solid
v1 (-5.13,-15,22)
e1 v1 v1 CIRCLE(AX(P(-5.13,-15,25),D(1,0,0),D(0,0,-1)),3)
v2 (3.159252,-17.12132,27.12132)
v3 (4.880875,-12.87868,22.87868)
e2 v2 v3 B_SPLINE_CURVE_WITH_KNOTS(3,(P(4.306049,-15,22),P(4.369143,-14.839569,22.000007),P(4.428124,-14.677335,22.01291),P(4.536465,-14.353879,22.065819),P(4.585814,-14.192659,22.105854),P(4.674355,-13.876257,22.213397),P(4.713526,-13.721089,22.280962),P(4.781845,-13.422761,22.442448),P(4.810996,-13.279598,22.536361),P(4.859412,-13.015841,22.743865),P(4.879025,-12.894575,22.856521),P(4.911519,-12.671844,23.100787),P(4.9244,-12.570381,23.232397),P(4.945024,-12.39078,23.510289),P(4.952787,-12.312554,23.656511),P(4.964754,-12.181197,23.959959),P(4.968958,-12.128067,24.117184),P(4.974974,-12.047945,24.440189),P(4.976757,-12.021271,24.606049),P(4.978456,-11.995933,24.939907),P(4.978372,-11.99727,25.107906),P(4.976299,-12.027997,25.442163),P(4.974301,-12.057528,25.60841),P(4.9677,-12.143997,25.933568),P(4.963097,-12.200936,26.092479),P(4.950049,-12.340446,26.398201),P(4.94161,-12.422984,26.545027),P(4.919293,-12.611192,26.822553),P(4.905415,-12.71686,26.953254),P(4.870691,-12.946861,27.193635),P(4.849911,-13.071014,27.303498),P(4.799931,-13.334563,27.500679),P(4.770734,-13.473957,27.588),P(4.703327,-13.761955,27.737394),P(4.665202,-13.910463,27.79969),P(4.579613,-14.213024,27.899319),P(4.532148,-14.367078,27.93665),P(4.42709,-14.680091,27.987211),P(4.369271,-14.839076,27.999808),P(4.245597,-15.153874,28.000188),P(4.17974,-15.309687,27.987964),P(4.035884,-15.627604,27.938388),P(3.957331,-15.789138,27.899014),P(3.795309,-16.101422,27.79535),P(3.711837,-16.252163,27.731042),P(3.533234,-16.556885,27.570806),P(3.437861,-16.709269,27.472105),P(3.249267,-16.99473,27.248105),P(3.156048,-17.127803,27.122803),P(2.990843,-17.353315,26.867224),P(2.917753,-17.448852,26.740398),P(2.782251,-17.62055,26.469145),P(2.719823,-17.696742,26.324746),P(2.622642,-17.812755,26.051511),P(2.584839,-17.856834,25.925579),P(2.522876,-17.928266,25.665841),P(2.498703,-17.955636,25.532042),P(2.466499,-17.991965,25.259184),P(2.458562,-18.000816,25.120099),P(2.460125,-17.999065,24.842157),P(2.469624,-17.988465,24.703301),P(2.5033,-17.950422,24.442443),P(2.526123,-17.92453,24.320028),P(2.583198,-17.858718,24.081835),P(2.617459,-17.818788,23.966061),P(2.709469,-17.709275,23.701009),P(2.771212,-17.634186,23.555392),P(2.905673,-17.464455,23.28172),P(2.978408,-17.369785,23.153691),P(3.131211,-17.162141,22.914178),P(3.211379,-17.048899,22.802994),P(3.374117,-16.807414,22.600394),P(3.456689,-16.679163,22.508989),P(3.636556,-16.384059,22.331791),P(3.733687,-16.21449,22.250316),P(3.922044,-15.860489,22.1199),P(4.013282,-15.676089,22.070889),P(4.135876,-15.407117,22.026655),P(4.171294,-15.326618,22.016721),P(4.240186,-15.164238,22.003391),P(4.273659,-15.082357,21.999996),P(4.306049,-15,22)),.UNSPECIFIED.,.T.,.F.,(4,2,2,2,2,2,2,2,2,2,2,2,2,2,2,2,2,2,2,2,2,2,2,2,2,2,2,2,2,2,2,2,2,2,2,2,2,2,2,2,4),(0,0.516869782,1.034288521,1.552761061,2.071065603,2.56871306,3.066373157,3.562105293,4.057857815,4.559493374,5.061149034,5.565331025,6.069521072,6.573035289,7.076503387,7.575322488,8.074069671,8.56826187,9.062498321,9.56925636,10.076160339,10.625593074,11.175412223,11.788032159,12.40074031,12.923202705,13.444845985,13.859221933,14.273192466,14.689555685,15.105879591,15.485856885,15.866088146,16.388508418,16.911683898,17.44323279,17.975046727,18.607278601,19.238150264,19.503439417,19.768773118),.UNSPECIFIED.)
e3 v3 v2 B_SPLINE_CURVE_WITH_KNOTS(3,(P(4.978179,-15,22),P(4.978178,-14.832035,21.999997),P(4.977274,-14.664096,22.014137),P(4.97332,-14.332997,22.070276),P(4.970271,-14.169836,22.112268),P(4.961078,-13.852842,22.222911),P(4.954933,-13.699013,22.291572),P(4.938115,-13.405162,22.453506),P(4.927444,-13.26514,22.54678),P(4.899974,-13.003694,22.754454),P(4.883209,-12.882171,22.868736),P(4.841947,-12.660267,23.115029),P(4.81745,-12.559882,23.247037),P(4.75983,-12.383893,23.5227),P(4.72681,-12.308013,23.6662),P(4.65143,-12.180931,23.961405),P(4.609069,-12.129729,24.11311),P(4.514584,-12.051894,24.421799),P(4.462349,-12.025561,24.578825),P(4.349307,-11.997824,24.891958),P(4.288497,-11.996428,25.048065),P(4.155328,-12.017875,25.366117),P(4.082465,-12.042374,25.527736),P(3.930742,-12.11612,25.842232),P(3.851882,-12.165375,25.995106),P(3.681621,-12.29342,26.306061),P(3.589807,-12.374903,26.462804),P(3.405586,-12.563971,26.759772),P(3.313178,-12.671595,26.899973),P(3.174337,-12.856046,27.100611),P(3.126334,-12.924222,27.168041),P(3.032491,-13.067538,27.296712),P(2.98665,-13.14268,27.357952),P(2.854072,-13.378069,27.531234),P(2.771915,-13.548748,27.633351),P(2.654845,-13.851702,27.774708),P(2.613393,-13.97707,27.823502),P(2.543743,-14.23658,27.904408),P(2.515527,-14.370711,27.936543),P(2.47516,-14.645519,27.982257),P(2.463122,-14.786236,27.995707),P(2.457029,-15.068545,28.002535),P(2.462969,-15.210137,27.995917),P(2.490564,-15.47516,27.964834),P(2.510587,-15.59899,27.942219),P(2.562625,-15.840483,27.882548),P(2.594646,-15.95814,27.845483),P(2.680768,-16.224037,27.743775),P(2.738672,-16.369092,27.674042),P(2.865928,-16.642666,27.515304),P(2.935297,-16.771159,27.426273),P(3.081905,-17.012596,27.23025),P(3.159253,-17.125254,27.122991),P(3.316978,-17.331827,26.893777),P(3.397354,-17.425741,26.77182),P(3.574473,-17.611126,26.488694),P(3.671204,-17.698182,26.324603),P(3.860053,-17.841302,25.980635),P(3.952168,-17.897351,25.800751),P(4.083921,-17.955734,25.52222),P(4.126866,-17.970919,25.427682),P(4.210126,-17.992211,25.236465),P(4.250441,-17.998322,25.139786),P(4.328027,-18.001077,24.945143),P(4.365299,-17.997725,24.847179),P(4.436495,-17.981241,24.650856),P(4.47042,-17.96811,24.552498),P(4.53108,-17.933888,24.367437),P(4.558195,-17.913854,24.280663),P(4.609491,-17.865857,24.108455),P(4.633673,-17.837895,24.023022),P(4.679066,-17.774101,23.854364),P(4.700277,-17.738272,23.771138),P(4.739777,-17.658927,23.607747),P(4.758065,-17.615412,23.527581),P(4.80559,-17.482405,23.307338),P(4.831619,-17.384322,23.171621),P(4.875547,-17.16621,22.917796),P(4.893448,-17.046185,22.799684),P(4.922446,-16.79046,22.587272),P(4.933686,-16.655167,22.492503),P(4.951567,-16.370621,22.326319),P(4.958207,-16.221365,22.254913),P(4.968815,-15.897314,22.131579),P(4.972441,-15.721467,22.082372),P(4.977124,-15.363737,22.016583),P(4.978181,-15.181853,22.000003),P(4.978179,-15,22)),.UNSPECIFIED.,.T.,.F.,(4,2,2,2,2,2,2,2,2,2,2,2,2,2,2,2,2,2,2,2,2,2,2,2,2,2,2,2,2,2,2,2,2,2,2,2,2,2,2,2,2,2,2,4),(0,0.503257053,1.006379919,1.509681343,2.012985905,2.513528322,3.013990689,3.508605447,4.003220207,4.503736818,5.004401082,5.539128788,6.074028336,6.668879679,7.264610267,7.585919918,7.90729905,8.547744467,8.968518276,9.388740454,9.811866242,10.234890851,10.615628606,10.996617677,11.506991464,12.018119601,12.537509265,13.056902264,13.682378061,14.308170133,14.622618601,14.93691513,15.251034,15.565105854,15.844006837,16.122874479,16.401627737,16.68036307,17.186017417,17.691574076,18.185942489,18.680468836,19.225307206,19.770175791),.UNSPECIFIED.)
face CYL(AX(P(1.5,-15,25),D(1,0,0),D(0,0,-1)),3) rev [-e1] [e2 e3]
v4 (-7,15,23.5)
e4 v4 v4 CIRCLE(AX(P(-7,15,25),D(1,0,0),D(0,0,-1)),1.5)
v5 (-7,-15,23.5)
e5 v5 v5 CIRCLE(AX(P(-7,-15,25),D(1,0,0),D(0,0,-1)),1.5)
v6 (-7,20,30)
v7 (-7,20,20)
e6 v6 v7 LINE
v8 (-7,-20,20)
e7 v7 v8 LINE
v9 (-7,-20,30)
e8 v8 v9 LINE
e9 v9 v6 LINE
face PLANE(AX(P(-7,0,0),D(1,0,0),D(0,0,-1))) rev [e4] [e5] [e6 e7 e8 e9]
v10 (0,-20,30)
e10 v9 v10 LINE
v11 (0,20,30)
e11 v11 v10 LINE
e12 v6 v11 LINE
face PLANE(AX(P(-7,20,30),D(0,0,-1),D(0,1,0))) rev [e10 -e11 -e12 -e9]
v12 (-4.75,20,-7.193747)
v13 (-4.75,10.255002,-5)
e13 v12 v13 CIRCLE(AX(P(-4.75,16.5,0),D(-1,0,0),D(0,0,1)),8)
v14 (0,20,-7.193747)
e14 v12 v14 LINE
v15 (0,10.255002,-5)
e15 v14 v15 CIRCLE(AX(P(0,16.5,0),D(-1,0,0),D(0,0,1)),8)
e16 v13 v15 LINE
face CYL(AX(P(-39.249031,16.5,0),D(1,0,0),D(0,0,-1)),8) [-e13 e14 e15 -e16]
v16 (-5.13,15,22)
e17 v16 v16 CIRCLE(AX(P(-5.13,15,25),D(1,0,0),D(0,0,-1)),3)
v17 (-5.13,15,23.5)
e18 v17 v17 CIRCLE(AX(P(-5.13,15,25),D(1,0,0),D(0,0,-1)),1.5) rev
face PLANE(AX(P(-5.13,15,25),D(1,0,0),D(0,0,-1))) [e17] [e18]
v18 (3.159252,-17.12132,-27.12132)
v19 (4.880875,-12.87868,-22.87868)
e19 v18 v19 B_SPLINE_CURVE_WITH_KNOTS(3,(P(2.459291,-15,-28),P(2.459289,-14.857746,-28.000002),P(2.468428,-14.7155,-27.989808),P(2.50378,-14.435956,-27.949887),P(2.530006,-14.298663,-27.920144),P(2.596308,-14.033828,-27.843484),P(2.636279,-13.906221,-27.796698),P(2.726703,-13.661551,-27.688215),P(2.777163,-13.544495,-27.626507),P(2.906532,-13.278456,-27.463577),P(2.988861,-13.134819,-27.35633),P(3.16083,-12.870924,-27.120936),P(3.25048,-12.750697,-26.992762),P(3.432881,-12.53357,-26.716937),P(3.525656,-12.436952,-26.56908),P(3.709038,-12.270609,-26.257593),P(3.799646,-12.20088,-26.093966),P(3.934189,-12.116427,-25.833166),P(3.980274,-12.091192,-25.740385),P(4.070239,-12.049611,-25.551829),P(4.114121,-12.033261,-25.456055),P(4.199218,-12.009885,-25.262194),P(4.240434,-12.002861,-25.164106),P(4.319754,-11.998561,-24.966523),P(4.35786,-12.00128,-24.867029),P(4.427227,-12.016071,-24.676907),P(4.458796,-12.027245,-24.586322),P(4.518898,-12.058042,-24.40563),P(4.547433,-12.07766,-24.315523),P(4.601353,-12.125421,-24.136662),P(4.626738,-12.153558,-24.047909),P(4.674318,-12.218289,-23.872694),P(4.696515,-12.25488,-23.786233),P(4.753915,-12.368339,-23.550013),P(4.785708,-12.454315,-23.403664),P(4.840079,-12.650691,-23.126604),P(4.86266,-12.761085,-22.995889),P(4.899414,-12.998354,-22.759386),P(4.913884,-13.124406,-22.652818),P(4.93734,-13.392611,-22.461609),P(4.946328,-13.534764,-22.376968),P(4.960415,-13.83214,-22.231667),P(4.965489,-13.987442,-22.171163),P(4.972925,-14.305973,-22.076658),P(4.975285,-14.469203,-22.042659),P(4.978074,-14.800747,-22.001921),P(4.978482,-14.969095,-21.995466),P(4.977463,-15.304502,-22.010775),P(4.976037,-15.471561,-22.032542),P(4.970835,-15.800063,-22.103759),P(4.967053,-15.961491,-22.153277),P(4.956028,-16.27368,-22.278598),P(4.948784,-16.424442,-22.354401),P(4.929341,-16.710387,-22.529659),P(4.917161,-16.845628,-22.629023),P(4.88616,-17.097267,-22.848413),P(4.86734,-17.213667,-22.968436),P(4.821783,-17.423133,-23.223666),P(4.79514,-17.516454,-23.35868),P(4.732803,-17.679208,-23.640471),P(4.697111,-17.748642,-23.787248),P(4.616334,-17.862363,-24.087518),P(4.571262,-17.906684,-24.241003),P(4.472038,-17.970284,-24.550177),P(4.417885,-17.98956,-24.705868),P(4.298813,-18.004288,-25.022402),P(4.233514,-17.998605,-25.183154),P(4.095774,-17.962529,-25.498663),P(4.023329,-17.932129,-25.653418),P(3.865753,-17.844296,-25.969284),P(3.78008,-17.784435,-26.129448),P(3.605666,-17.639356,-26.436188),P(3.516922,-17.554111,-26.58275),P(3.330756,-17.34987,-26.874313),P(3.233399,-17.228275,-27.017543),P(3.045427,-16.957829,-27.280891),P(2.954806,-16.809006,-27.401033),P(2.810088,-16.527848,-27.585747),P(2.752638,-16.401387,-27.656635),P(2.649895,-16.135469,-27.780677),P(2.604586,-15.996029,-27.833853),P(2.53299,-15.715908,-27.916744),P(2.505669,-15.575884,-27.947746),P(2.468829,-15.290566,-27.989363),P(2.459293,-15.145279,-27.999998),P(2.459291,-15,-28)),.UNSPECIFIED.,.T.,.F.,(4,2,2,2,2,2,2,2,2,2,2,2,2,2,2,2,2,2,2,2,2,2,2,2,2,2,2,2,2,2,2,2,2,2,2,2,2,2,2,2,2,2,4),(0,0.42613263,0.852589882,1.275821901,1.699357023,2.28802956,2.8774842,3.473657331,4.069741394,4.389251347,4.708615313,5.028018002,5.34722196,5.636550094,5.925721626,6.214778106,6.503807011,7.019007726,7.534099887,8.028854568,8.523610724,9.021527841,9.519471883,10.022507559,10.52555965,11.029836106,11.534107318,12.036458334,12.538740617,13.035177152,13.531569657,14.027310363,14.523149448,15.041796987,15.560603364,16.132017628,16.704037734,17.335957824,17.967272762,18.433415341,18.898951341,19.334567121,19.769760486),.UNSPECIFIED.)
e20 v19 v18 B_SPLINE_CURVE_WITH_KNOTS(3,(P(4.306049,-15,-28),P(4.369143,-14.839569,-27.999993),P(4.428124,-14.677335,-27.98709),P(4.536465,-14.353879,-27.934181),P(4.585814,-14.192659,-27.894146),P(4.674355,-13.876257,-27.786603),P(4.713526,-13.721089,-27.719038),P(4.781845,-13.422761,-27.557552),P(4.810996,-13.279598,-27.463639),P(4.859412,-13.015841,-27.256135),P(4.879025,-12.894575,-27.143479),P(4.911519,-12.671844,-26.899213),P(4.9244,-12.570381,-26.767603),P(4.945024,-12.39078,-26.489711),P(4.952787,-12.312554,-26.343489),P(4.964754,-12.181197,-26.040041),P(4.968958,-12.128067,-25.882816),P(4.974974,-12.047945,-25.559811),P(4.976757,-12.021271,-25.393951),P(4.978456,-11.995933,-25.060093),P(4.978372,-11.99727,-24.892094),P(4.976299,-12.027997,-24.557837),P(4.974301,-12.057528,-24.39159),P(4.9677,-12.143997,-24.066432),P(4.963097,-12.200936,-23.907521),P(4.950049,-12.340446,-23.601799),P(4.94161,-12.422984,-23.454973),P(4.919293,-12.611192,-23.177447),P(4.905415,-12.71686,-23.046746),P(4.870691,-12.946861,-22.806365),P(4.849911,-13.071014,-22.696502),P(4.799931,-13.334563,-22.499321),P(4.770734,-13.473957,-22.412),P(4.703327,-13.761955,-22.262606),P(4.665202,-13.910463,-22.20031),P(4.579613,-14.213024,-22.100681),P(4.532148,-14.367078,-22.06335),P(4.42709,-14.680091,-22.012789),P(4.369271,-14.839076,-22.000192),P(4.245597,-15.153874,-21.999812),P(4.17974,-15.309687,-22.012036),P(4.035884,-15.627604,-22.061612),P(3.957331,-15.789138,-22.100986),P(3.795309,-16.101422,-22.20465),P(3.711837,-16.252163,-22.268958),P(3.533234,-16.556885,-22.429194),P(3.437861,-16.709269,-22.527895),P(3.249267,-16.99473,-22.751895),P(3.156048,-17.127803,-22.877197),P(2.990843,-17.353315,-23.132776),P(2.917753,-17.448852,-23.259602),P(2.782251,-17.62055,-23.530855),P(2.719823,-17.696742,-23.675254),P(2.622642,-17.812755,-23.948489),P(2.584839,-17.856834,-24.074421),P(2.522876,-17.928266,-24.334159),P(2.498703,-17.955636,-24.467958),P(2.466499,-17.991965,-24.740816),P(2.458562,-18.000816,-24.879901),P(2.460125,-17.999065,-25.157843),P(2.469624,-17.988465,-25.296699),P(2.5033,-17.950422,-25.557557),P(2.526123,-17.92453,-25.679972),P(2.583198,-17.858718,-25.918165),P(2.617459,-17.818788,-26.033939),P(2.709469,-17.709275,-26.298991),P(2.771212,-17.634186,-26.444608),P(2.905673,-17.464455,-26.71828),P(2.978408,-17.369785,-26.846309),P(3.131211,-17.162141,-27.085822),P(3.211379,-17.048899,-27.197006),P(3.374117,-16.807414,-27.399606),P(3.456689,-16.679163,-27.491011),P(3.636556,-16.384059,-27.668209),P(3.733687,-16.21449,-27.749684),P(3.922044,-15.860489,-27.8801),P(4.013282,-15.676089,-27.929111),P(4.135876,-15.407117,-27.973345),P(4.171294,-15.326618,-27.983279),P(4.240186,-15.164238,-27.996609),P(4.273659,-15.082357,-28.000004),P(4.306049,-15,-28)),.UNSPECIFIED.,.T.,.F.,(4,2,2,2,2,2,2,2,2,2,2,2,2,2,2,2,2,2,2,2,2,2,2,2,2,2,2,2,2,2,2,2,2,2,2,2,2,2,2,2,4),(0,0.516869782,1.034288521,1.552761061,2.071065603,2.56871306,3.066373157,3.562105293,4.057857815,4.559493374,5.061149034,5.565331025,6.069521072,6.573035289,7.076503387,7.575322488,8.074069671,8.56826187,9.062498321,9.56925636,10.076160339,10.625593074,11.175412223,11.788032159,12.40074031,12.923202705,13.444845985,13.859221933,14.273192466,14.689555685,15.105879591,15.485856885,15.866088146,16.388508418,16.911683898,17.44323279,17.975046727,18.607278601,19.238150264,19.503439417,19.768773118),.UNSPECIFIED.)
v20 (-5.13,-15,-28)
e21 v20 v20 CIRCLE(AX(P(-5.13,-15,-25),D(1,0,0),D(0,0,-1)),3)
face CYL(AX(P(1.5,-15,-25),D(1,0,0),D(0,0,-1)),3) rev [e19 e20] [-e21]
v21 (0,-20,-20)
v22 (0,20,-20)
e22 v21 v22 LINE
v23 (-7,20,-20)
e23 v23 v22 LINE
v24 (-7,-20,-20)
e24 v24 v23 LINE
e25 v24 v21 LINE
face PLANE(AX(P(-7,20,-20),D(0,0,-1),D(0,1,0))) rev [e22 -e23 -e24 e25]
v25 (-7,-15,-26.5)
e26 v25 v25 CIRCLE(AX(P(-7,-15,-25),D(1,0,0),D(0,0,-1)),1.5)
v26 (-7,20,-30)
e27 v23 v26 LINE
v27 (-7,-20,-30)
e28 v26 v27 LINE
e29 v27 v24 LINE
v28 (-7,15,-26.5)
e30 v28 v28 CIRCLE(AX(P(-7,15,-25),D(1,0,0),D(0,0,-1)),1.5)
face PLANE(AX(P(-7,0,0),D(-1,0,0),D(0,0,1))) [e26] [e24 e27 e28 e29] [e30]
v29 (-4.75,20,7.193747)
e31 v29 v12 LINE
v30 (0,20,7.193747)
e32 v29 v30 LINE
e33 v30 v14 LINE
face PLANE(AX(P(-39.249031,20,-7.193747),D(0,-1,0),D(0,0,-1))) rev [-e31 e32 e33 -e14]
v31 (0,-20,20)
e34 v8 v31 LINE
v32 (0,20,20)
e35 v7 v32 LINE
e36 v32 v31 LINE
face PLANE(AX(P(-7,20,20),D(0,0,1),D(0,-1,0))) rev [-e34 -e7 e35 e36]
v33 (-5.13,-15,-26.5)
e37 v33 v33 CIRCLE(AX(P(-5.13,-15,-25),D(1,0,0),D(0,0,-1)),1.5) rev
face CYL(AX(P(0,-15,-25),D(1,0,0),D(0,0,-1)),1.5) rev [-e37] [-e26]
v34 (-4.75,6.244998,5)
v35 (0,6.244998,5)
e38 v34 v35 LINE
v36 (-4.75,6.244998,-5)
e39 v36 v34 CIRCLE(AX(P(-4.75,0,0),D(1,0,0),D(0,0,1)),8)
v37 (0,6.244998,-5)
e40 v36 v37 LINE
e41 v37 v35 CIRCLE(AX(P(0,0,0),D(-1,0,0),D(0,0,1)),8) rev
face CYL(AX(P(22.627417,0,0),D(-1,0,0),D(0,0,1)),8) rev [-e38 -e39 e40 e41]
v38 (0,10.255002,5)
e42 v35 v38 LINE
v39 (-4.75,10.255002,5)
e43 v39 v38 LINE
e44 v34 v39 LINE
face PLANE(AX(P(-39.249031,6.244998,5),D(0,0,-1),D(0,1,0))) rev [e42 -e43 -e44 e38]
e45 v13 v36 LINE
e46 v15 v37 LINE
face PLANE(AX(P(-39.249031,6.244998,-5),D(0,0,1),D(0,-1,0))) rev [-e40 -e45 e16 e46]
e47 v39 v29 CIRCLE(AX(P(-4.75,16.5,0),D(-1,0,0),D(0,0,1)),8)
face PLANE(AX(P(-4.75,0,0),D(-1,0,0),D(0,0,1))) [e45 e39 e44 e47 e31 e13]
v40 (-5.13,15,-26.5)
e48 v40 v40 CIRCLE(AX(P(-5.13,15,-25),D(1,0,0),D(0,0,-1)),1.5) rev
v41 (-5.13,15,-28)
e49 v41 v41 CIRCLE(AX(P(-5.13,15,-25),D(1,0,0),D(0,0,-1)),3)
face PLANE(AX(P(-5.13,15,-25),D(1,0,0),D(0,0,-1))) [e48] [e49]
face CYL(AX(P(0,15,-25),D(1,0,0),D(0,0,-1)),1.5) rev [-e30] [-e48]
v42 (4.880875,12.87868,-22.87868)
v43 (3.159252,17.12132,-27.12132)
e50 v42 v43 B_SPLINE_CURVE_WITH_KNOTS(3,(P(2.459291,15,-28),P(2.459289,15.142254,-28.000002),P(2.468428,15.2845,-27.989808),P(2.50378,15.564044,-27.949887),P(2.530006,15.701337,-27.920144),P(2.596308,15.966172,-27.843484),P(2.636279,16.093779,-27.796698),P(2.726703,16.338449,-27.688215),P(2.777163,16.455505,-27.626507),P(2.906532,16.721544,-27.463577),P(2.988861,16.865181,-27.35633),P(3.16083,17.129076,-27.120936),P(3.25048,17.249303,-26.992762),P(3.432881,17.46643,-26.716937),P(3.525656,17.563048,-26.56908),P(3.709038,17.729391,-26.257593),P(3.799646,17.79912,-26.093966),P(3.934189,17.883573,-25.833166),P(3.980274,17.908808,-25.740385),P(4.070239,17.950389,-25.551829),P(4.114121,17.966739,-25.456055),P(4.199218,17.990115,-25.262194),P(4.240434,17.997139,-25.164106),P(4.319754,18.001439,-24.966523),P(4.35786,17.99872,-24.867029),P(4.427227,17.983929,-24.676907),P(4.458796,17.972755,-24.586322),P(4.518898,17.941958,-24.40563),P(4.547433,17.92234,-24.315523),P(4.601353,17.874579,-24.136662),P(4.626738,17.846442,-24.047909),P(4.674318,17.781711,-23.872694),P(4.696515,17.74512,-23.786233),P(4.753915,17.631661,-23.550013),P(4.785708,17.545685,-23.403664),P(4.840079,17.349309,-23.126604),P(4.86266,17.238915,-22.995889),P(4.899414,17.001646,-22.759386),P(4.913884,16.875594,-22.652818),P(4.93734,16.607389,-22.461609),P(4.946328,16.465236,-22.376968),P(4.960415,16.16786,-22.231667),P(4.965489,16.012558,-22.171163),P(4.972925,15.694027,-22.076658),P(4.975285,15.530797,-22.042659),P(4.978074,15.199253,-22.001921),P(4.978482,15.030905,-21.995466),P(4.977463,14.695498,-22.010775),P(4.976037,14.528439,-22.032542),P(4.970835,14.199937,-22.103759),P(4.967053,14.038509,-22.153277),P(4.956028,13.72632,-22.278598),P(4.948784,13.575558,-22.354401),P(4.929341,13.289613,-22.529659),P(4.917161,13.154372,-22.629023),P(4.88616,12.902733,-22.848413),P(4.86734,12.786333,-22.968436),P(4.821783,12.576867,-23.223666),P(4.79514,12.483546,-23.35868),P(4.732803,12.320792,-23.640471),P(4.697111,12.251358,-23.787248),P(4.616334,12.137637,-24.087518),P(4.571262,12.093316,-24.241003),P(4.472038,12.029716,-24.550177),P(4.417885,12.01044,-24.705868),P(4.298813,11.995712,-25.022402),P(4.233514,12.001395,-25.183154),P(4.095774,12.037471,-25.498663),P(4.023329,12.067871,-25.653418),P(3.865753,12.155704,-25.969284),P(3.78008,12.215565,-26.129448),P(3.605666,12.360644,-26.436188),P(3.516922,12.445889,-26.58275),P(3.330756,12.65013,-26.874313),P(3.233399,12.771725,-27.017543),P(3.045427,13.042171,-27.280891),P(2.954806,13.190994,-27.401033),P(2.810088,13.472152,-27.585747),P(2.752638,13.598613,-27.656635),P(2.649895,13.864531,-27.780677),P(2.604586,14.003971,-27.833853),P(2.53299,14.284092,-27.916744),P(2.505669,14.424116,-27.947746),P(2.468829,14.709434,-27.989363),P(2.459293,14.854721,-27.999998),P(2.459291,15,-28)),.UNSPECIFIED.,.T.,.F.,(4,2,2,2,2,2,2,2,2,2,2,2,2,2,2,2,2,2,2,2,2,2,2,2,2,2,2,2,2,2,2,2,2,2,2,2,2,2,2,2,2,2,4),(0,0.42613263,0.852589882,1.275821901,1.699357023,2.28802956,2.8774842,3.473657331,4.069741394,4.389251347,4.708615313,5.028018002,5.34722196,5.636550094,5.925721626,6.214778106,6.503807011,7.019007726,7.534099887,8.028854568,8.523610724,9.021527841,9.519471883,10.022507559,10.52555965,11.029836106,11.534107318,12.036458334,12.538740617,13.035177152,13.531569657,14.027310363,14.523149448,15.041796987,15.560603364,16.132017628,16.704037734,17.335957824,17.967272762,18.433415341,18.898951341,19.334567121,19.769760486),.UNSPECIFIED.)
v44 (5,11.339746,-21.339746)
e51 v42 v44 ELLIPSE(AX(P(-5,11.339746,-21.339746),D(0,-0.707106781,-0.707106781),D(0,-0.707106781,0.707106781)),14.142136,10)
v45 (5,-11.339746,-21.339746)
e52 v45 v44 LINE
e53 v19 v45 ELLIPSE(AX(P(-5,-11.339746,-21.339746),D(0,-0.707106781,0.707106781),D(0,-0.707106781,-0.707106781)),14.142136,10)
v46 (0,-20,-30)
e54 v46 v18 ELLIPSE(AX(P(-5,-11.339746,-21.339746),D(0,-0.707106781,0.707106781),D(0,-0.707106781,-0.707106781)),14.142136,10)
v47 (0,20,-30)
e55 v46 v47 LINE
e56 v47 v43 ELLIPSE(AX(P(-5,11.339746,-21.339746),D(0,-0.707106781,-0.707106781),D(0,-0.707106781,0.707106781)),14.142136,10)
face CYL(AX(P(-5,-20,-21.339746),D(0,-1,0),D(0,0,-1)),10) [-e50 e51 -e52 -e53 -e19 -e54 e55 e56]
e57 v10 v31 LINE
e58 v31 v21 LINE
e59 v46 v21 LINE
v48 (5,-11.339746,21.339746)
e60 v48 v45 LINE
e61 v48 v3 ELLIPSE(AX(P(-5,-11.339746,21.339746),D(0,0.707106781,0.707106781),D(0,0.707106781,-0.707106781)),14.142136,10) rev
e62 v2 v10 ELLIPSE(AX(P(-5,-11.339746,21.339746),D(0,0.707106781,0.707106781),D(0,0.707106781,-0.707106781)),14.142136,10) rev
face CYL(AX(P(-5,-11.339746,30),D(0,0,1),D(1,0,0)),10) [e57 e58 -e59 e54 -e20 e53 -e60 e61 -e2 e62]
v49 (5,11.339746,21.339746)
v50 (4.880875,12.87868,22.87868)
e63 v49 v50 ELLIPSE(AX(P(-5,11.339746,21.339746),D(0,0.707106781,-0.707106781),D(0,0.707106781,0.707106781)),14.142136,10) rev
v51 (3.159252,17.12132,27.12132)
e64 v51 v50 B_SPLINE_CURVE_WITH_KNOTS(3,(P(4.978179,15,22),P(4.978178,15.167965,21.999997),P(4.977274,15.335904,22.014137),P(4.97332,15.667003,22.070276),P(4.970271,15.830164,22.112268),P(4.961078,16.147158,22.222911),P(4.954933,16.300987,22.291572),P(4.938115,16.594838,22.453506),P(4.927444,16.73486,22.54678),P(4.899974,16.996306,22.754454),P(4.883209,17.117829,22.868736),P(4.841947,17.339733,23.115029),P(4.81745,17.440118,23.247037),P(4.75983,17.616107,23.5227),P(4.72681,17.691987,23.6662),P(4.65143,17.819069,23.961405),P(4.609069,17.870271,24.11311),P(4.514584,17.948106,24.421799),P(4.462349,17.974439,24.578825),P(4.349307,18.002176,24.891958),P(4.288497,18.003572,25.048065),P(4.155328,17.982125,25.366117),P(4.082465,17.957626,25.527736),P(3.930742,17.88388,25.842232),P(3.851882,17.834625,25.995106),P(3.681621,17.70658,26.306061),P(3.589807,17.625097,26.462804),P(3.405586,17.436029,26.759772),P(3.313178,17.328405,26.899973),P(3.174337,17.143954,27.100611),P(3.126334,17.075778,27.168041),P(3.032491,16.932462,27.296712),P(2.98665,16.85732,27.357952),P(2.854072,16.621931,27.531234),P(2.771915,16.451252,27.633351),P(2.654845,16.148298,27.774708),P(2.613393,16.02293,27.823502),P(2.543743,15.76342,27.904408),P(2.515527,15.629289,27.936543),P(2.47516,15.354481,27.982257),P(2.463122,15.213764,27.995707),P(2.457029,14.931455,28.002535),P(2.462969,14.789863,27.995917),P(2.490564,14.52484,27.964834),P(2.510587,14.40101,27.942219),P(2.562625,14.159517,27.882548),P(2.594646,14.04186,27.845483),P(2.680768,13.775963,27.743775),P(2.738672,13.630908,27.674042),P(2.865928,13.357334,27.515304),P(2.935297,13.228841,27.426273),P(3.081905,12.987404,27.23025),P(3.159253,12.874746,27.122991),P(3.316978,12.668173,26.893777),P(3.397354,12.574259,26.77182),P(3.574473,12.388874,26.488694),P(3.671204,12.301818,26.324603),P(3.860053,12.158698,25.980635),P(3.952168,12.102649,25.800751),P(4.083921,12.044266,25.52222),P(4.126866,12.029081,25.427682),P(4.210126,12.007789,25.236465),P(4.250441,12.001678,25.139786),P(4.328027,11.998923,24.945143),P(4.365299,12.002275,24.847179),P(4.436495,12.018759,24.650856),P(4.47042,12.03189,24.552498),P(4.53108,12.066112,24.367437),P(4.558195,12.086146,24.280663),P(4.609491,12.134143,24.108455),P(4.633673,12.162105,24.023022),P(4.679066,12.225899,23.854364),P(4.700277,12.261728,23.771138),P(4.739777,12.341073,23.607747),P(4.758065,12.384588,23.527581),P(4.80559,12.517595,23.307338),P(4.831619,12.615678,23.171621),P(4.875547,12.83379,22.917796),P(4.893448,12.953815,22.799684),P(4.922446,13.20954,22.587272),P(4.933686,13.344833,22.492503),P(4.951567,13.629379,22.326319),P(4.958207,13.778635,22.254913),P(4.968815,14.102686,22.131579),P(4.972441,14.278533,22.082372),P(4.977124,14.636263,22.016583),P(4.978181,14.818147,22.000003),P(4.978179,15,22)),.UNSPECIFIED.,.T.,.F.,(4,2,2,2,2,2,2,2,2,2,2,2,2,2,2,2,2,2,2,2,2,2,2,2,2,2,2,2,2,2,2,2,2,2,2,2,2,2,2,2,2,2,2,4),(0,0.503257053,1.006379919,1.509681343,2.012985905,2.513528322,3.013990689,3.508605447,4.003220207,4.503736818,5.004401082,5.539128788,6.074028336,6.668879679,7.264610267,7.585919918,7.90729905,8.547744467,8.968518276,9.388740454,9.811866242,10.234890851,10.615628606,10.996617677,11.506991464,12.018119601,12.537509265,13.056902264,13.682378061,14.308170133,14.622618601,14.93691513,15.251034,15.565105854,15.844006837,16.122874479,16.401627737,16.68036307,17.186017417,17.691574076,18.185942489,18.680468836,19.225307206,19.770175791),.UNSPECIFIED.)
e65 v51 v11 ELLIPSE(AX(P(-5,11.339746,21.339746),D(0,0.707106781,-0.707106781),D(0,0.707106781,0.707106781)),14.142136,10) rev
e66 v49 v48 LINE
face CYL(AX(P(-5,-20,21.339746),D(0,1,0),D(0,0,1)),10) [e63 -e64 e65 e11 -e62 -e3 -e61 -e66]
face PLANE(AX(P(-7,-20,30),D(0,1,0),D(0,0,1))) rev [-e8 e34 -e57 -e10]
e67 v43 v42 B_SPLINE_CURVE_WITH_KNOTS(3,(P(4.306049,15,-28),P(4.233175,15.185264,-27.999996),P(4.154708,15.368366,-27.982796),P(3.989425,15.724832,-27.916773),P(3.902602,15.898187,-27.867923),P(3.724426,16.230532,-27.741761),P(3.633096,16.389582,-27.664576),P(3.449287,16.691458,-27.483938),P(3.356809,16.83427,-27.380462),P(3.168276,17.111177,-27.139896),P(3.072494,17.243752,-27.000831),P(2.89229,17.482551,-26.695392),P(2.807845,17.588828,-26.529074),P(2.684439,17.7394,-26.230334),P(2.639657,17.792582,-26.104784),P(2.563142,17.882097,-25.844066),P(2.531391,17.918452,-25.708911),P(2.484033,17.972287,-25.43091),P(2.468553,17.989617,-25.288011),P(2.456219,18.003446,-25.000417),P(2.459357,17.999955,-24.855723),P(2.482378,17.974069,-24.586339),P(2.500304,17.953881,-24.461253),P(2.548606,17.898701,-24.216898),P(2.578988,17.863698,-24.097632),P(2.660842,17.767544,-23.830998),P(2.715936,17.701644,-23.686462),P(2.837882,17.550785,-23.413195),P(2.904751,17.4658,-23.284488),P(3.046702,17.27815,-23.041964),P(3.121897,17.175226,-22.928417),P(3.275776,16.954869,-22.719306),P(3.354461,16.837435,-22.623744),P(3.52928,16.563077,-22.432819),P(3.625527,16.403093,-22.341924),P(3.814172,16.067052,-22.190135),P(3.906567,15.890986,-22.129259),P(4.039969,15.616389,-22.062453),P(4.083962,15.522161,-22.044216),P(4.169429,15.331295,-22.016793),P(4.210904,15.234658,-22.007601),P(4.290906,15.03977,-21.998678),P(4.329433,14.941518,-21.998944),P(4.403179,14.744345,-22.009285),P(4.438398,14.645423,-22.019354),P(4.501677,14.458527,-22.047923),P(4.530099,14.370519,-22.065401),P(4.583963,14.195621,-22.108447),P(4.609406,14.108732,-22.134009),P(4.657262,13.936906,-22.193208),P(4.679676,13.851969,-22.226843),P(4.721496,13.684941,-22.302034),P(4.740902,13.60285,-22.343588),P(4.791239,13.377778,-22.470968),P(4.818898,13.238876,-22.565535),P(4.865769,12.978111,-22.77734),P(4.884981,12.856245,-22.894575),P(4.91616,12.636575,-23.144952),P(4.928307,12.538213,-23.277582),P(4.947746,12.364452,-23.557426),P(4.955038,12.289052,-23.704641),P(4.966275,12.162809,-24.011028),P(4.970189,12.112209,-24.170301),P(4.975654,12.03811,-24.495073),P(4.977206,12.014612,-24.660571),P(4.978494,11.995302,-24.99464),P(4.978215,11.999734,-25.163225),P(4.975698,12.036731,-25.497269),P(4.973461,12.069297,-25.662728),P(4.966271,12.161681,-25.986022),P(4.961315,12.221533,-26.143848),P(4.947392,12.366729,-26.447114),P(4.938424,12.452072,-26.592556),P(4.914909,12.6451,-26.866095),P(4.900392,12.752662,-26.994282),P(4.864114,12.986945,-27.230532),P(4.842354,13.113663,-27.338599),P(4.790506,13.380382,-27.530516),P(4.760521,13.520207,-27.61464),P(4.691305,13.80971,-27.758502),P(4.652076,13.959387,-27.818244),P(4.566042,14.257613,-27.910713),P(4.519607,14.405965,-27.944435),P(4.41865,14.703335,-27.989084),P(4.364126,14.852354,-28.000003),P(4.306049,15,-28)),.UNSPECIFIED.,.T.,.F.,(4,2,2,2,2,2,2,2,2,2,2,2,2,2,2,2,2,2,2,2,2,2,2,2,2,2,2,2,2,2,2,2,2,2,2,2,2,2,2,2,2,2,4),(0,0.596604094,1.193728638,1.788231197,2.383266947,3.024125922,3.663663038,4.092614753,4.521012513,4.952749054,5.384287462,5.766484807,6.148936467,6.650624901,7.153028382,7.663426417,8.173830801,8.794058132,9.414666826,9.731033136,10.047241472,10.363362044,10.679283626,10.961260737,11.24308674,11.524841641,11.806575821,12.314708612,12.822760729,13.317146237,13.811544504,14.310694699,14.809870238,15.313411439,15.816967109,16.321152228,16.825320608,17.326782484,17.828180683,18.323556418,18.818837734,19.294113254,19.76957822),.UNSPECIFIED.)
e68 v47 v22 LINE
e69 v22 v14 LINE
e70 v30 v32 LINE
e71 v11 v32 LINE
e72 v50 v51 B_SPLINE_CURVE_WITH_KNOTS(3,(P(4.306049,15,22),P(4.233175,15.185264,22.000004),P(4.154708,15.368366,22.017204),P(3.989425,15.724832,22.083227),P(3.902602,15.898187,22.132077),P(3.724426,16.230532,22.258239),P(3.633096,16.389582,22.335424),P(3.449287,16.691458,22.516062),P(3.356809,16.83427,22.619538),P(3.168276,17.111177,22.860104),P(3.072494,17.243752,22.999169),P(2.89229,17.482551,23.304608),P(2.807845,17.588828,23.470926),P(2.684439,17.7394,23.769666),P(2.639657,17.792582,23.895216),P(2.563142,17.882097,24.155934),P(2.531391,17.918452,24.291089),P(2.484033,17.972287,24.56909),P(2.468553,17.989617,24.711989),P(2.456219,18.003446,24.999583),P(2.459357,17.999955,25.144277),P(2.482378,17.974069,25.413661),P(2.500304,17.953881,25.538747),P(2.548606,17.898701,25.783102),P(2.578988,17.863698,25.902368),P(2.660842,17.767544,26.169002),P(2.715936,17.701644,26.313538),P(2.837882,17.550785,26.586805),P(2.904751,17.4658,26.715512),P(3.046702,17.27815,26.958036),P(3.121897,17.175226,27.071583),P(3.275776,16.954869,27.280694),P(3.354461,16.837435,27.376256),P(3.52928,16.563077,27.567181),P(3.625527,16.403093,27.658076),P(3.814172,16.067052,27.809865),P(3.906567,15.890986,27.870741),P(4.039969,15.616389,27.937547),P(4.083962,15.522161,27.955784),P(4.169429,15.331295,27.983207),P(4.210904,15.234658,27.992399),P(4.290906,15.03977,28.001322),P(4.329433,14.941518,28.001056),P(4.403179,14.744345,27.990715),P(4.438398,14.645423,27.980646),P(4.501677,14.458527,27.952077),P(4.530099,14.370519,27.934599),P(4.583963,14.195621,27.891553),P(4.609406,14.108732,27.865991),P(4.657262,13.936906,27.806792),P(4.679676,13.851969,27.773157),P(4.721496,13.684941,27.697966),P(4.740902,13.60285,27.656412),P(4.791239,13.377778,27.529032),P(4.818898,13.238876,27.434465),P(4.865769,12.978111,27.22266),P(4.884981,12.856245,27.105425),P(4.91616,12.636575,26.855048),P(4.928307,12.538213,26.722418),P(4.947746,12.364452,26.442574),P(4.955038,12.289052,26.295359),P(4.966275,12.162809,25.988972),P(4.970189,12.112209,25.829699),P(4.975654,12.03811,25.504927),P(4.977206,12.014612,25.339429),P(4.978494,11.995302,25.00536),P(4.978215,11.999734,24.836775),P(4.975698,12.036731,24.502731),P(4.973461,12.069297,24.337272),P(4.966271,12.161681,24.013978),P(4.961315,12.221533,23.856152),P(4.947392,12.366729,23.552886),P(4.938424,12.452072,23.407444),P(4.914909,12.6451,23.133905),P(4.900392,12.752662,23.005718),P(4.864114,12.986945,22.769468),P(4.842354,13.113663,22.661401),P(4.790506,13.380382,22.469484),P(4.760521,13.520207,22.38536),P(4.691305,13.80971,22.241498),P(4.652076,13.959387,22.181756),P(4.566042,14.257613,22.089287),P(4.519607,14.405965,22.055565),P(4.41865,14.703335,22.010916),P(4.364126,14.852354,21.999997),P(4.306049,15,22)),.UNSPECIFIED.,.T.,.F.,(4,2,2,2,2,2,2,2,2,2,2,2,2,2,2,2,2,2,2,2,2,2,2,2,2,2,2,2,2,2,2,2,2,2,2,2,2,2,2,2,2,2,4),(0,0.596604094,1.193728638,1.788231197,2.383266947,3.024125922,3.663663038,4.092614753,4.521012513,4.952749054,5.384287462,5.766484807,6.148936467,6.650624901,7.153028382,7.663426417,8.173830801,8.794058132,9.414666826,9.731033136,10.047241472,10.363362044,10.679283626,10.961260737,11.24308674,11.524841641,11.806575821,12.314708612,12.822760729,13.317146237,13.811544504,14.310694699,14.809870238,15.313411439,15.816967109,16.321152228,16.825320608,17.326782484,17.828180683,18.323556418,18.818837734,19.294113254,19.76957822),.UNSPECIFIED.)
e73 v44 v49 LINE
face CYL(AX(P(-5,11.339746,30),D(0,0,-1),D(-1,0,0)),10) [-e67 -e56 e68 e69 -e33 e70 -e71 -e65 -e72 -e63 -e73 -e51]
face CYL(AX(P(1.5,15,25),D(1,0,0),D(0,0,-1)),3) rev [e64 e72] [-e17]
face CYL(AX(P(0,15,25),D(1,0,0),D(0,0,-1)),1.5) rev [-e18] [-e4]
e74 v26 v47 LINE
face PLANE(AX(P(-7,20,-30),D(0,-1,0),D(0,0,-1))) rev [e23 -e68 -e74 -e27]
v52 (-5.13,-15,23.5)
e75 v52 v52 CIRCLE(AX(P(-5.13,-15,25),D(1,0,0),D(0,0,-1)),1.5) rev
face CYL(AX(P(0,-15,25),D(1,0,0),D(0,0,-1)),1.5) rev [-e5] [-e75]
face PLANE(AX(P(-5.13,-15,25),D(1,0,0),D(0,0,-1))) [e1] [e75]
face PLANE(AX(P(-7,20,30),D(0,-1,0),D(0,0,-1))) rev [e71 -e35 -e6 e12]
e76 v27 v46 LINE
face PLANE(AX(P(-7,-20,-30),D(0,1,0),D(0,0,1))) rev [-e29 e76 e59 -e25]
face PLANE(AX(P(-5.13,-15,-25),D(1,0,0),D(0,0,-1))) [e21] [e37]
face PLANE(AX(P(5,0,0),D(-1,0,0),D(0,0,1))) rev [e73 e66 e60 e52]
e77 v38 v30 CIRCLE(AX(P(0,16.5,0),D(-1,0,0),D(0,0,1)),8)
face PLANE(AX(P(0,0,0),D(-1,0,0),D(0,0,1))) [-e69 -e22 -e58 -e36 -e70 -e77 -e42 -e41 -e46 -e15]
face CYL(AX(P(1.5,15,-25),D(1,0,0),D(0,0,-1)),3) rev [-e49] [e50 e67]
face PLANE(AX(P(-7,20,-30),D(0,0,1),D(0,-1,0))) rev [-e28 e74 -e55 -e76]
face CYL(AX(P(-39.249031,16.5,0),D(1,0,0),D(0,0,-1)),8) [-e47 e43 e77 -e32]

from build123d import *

# Parameters (mm, degrees)
CROQUIS1_W                 = 60
CROQUIS1_H                 = 40
SALIENTE_EXTRUIR1_DEPTH    = 5
CROQUIS3_R                 = 1.5
CORTAR_EXTRUIR1_DEPTH      = 37.400549446
REDONDEO1_R                = 10
CROQUIS5_R                 = 3
CORTAR_EXTRUIR2_DEPTH      = 3.5
CROQUIS9_W                 = 10
CROQUIS9_H                 = 40
SALIENTE_EXTRUIR3_DEPTH    = 7
CORTAR_EXTRUIR5_DEPTH      = 37.728735481
CORTAR_EXTRUIR5_DEPTH_BACK = 37.728735481
CROQUIS10_R                = 1.5
CROQUIS11_R                = 3
CORTAR_EXTRUIR6_DEPTH      = 6.63
SALIENTE_EXTRUIR4_DEPTH    = 7
CORTAR_EXTRUIR7_START      = -7
CROQUIS13_R                = 8
CORTAR_EXTRUIR7_DEPTH      = 7
CORTAR_EXTRUIR8_START      = -2.25
CORTAR_EXTRUIR8_DEPTH      = 2.25


with BuildPart() as part:
    # Croquis1 → Saliente-Extruir1 (new body)
    with BuildSketch(Plane(origin=(0, 0, 0), x_dir=(0, 0, -1), z_dir=(1, 0, 0))):
        Rectangle(CROQUIS1_W, CROQUIS1_H)
    extrude(amount=SALIENTE_EXTRUIR1_DEPTH)

    # Croquis3 → Cortar-Extruir1 (cut, through all)
    with BuildSketch(Plane(origin=(5, 0, 0), x_dir=(0, 0, -1), z_dir=(1, 0, 0))):
        with Locations((-25, 15)):
            Circle(CROQUIS3_R)
        with Locations(Location((25, 15, 0), (0, 0, 180))):
            Circle(CROQUIS3_R)
        with Locations((25, -15)):
            Circle(CROQUIS3_R)
        with Locations(Location((-25, -15, 0), (0, 0, 180))):
            Circle(CROQUIS3_R)
    extrude(amount=-CORTAR_EXTRUIR1_DEPTH, mode=Mode.SUBTRACT)

    # Redondeo1
    # the kernel refuses this fillet: 10 mm, written as the material it takes off along each edge
    with BuildSketch(Plane(origin=(5, -20, 51.650635095), x_dir=(-1, 0, 0), z_dir=(0, 0, -1))) as redondeo1_piece_1:
        with BuildLine():
            CenterArc((10, 8.660254038), REDONDEO1_R, 180, 60)
            Line((0, 8.660254038), (-0.2, 8.660254038))
            Line((-0.2, 8.660254038), (-0.2, 0))
            Line((-0.2, 0), (0, -0.2))
            ThreePointArc((0, -0.2), (2.5, -0.2), (4.9, -0.173205081))
            Line((4.9, -0.173205081), (5, 0))
        make_face()
    extrude(amount=103.301270189, mode=Mode.SUBTRACT)
    with BuildSketch(Plane(origin=(5, 20, -51.650635095), x_dir=(0, -1, 0), z_dir=(0, 0, 1))) as redondeo1_piece_2:
        with BuildLine():
            CenterArc((8.660254038, -10), REDONDEO1_R, 90, 60)
            Line((0, -5), (-0.173205081, -4.9))
            ThreePointArc((-0.173205081, -4.9), (-0.2, -2.5), (-0.2, 0))
            Line((-0.2, 0), (0, 0.2))
            Line((0, 0.2), (8.660254038, 0.2))
            Line((8.660254038, 0.2), (8.660254038, 0))
        make_face()
    extrude(amount=103.301270189, mode=Mode.SUBTRACT)
    with BuildSketch(Plane(origin=(5, 41.650635095, 30), x_dir=(-1, 0, 0), z_dir=(0, -1, 0)), Plane(origin=(5, -41.650635095, -30), x_dir=(-1, 0, 0), z_dir=(0, 1, 0))) as redondeo1_piece_3:
        with BuildLine():
            CenterArc((10, 8.660254038), REDONDEO1_R, 180, 60)
            Line((0, 8.660254038), (-0.2, 8.660254038))
            Line((-0.2, 8.660254038), (-0.2, 0))
            Line((-0.2, 0), (0, -0.2))
            ThreePointArc((0, -0.2), (2.5, -0.2), (4.9, -0.173205081))
            Line((4.9, -0.173205081), (5, 0))
        make_face()
    extrude(amount=83.301270189, mode=Mode.SUBTRACT)

    # Croquis5 → Cortar-Extruir2 (cut)
    with BuildSketch(Plane(origin=(5, 0, 0), x_dir=(0, 0, -1), z_dir=(1, 0, 0))):
        with Locations((-25, 15)):
            Circle(CROQUIS5_R)
        with Locations((25, 15)):
            Circle(CROQUIS5_R)
        with Locations((25, -15)):
            Circle(CROQUIS5_R)
        with Locations((-25, -15)):
            Circle(CROQUIS5_R)
    extrude(amount=-CORTAR_EXTRUIR2_DEPTH, mode=Mode.SUBTRACT)

    # Croquis9 → Saliente-Extruir3 (add)
    with BuildSketch(Plane.ZY):
        with Locations((-25, 0)):
            Rectangle(CROQUIS9_W, CROQUIS9_H)
        with Locations((25, 0)):
            Rectangle(CROQUIS9_W, CROQUIS9_H)
    extrude(amount=SALIENTE_EXTRUIR3_DEPTH)

    # Croquis10 → Cortar-Extruir5 (cut, two sides: drawn at the far end of the back side and taken through both)
    with BuildSketch(Plane(origin=(0, 0, 0), x_dir=(0, 0, -1), z_dir=(1, 0, 0)).offset(-CORTAR_EXTRUIR5_DEPTH_BACK)):
        with Locations((-25, -15)):
            Circle(CROQUIS10_R)
        with Locations((25, -15)):
            Circle(CROQUIS10_R)
        with Locations((25, 15)):
            Circle(CROQUIS10_R)
        with Locations((-25, 15)):
            Circle(CROQUIS10_R)
    extrude(amount=CORTAR_EXTRUIR5_DEPTH + CORTAR_EXTRUIR5_DEPTH_BACK, mode=Mode.SUBTRACT)

    # Croquis11 → Cortar-Extruir6 (cut)
    with BuildSketch(Plane(origin=(1.5, 0, 0), x_dir=(0, 0, -1), z_dir=(1, 0, 0))):
        with Locations((-25, 15)):
            Circle(CROQUIS11_R)
        with Locations((25, -15)):
            Circle(CROQUIS11_R)
        with Locations((-25, -15)):
            Circle(CROQUIS11_R)
        with Locations((25, 15)):
            Circle(CROQUIS11_R)
    extrude(amount=-CORTAR_EXTRUIR6_DEPTH, mode=Mode.SUBTRACT)

    # Croquis12 → Saliente-Extruir4 (add)
    with BuildSketch(Plane.ZY):
        with BuildLine():
            Line((-5, 6.244997998), (-5, 10.255002002))
            ThreePointArc((-5, 10.255002002), (-7.804685433, 14.743046588), (-7.193747285, 20))
            Line((-7.193747285, 20), (7.193747285, 20))
            ThreePointArc((7.193747285, 20), (7.804685433, 14.743046588), (5, 10.255002002))
            Line((5, 10.255002002), (5, 6.244997998))
            ThreePointArc((5, 6.244997998), (0, -8), (-5, 6.244997998))
        make_face()
    extrude(amount=SALIENTE_EXTRUIR4_DEPTH)

    # Croquis13 → Cortar-Extruir7 (cut)
    with BuildSketch(Plane.ZY.offset(7).offset(CORTAR_EXTRUIR7_START)):
        Circle(CROQUIS13_R)
    extrude(amount=CORTAR_EXTRUIR7_DEPTH, mode=Mode.SUBTRACT)

    # Croquis15 → Cortar-Extruir8 (cut)
    with BuildSketch(Plane.ZY.offset(7).offset(CORTAR_EXTRUIR8_START)):
        with BuildLine():
            Line((5, 6.244997998), (5, 10.255002002))
            ThreePointArc((5, 10.255002002), (7.804685433, 14.743046588), (7.193747285, 20))
            Line((7.193747285, 20), (-7.193747285, 20))
            ThreePointArc((-7.193747285, 20), (-7.804685433, 14.743046588), (-5, 10.255002002))
            Line((-5, 10.255002002), (-5, 6.244997998))
            ThreePointArc((-5, 6.244997998), (0, 8), (5, 6.244997998))
        make_face()
    extrude(amount=CORTAR_EXTRUIR8_DEPTH, mode=Mode.SUBTRACT)


solid = part.part
